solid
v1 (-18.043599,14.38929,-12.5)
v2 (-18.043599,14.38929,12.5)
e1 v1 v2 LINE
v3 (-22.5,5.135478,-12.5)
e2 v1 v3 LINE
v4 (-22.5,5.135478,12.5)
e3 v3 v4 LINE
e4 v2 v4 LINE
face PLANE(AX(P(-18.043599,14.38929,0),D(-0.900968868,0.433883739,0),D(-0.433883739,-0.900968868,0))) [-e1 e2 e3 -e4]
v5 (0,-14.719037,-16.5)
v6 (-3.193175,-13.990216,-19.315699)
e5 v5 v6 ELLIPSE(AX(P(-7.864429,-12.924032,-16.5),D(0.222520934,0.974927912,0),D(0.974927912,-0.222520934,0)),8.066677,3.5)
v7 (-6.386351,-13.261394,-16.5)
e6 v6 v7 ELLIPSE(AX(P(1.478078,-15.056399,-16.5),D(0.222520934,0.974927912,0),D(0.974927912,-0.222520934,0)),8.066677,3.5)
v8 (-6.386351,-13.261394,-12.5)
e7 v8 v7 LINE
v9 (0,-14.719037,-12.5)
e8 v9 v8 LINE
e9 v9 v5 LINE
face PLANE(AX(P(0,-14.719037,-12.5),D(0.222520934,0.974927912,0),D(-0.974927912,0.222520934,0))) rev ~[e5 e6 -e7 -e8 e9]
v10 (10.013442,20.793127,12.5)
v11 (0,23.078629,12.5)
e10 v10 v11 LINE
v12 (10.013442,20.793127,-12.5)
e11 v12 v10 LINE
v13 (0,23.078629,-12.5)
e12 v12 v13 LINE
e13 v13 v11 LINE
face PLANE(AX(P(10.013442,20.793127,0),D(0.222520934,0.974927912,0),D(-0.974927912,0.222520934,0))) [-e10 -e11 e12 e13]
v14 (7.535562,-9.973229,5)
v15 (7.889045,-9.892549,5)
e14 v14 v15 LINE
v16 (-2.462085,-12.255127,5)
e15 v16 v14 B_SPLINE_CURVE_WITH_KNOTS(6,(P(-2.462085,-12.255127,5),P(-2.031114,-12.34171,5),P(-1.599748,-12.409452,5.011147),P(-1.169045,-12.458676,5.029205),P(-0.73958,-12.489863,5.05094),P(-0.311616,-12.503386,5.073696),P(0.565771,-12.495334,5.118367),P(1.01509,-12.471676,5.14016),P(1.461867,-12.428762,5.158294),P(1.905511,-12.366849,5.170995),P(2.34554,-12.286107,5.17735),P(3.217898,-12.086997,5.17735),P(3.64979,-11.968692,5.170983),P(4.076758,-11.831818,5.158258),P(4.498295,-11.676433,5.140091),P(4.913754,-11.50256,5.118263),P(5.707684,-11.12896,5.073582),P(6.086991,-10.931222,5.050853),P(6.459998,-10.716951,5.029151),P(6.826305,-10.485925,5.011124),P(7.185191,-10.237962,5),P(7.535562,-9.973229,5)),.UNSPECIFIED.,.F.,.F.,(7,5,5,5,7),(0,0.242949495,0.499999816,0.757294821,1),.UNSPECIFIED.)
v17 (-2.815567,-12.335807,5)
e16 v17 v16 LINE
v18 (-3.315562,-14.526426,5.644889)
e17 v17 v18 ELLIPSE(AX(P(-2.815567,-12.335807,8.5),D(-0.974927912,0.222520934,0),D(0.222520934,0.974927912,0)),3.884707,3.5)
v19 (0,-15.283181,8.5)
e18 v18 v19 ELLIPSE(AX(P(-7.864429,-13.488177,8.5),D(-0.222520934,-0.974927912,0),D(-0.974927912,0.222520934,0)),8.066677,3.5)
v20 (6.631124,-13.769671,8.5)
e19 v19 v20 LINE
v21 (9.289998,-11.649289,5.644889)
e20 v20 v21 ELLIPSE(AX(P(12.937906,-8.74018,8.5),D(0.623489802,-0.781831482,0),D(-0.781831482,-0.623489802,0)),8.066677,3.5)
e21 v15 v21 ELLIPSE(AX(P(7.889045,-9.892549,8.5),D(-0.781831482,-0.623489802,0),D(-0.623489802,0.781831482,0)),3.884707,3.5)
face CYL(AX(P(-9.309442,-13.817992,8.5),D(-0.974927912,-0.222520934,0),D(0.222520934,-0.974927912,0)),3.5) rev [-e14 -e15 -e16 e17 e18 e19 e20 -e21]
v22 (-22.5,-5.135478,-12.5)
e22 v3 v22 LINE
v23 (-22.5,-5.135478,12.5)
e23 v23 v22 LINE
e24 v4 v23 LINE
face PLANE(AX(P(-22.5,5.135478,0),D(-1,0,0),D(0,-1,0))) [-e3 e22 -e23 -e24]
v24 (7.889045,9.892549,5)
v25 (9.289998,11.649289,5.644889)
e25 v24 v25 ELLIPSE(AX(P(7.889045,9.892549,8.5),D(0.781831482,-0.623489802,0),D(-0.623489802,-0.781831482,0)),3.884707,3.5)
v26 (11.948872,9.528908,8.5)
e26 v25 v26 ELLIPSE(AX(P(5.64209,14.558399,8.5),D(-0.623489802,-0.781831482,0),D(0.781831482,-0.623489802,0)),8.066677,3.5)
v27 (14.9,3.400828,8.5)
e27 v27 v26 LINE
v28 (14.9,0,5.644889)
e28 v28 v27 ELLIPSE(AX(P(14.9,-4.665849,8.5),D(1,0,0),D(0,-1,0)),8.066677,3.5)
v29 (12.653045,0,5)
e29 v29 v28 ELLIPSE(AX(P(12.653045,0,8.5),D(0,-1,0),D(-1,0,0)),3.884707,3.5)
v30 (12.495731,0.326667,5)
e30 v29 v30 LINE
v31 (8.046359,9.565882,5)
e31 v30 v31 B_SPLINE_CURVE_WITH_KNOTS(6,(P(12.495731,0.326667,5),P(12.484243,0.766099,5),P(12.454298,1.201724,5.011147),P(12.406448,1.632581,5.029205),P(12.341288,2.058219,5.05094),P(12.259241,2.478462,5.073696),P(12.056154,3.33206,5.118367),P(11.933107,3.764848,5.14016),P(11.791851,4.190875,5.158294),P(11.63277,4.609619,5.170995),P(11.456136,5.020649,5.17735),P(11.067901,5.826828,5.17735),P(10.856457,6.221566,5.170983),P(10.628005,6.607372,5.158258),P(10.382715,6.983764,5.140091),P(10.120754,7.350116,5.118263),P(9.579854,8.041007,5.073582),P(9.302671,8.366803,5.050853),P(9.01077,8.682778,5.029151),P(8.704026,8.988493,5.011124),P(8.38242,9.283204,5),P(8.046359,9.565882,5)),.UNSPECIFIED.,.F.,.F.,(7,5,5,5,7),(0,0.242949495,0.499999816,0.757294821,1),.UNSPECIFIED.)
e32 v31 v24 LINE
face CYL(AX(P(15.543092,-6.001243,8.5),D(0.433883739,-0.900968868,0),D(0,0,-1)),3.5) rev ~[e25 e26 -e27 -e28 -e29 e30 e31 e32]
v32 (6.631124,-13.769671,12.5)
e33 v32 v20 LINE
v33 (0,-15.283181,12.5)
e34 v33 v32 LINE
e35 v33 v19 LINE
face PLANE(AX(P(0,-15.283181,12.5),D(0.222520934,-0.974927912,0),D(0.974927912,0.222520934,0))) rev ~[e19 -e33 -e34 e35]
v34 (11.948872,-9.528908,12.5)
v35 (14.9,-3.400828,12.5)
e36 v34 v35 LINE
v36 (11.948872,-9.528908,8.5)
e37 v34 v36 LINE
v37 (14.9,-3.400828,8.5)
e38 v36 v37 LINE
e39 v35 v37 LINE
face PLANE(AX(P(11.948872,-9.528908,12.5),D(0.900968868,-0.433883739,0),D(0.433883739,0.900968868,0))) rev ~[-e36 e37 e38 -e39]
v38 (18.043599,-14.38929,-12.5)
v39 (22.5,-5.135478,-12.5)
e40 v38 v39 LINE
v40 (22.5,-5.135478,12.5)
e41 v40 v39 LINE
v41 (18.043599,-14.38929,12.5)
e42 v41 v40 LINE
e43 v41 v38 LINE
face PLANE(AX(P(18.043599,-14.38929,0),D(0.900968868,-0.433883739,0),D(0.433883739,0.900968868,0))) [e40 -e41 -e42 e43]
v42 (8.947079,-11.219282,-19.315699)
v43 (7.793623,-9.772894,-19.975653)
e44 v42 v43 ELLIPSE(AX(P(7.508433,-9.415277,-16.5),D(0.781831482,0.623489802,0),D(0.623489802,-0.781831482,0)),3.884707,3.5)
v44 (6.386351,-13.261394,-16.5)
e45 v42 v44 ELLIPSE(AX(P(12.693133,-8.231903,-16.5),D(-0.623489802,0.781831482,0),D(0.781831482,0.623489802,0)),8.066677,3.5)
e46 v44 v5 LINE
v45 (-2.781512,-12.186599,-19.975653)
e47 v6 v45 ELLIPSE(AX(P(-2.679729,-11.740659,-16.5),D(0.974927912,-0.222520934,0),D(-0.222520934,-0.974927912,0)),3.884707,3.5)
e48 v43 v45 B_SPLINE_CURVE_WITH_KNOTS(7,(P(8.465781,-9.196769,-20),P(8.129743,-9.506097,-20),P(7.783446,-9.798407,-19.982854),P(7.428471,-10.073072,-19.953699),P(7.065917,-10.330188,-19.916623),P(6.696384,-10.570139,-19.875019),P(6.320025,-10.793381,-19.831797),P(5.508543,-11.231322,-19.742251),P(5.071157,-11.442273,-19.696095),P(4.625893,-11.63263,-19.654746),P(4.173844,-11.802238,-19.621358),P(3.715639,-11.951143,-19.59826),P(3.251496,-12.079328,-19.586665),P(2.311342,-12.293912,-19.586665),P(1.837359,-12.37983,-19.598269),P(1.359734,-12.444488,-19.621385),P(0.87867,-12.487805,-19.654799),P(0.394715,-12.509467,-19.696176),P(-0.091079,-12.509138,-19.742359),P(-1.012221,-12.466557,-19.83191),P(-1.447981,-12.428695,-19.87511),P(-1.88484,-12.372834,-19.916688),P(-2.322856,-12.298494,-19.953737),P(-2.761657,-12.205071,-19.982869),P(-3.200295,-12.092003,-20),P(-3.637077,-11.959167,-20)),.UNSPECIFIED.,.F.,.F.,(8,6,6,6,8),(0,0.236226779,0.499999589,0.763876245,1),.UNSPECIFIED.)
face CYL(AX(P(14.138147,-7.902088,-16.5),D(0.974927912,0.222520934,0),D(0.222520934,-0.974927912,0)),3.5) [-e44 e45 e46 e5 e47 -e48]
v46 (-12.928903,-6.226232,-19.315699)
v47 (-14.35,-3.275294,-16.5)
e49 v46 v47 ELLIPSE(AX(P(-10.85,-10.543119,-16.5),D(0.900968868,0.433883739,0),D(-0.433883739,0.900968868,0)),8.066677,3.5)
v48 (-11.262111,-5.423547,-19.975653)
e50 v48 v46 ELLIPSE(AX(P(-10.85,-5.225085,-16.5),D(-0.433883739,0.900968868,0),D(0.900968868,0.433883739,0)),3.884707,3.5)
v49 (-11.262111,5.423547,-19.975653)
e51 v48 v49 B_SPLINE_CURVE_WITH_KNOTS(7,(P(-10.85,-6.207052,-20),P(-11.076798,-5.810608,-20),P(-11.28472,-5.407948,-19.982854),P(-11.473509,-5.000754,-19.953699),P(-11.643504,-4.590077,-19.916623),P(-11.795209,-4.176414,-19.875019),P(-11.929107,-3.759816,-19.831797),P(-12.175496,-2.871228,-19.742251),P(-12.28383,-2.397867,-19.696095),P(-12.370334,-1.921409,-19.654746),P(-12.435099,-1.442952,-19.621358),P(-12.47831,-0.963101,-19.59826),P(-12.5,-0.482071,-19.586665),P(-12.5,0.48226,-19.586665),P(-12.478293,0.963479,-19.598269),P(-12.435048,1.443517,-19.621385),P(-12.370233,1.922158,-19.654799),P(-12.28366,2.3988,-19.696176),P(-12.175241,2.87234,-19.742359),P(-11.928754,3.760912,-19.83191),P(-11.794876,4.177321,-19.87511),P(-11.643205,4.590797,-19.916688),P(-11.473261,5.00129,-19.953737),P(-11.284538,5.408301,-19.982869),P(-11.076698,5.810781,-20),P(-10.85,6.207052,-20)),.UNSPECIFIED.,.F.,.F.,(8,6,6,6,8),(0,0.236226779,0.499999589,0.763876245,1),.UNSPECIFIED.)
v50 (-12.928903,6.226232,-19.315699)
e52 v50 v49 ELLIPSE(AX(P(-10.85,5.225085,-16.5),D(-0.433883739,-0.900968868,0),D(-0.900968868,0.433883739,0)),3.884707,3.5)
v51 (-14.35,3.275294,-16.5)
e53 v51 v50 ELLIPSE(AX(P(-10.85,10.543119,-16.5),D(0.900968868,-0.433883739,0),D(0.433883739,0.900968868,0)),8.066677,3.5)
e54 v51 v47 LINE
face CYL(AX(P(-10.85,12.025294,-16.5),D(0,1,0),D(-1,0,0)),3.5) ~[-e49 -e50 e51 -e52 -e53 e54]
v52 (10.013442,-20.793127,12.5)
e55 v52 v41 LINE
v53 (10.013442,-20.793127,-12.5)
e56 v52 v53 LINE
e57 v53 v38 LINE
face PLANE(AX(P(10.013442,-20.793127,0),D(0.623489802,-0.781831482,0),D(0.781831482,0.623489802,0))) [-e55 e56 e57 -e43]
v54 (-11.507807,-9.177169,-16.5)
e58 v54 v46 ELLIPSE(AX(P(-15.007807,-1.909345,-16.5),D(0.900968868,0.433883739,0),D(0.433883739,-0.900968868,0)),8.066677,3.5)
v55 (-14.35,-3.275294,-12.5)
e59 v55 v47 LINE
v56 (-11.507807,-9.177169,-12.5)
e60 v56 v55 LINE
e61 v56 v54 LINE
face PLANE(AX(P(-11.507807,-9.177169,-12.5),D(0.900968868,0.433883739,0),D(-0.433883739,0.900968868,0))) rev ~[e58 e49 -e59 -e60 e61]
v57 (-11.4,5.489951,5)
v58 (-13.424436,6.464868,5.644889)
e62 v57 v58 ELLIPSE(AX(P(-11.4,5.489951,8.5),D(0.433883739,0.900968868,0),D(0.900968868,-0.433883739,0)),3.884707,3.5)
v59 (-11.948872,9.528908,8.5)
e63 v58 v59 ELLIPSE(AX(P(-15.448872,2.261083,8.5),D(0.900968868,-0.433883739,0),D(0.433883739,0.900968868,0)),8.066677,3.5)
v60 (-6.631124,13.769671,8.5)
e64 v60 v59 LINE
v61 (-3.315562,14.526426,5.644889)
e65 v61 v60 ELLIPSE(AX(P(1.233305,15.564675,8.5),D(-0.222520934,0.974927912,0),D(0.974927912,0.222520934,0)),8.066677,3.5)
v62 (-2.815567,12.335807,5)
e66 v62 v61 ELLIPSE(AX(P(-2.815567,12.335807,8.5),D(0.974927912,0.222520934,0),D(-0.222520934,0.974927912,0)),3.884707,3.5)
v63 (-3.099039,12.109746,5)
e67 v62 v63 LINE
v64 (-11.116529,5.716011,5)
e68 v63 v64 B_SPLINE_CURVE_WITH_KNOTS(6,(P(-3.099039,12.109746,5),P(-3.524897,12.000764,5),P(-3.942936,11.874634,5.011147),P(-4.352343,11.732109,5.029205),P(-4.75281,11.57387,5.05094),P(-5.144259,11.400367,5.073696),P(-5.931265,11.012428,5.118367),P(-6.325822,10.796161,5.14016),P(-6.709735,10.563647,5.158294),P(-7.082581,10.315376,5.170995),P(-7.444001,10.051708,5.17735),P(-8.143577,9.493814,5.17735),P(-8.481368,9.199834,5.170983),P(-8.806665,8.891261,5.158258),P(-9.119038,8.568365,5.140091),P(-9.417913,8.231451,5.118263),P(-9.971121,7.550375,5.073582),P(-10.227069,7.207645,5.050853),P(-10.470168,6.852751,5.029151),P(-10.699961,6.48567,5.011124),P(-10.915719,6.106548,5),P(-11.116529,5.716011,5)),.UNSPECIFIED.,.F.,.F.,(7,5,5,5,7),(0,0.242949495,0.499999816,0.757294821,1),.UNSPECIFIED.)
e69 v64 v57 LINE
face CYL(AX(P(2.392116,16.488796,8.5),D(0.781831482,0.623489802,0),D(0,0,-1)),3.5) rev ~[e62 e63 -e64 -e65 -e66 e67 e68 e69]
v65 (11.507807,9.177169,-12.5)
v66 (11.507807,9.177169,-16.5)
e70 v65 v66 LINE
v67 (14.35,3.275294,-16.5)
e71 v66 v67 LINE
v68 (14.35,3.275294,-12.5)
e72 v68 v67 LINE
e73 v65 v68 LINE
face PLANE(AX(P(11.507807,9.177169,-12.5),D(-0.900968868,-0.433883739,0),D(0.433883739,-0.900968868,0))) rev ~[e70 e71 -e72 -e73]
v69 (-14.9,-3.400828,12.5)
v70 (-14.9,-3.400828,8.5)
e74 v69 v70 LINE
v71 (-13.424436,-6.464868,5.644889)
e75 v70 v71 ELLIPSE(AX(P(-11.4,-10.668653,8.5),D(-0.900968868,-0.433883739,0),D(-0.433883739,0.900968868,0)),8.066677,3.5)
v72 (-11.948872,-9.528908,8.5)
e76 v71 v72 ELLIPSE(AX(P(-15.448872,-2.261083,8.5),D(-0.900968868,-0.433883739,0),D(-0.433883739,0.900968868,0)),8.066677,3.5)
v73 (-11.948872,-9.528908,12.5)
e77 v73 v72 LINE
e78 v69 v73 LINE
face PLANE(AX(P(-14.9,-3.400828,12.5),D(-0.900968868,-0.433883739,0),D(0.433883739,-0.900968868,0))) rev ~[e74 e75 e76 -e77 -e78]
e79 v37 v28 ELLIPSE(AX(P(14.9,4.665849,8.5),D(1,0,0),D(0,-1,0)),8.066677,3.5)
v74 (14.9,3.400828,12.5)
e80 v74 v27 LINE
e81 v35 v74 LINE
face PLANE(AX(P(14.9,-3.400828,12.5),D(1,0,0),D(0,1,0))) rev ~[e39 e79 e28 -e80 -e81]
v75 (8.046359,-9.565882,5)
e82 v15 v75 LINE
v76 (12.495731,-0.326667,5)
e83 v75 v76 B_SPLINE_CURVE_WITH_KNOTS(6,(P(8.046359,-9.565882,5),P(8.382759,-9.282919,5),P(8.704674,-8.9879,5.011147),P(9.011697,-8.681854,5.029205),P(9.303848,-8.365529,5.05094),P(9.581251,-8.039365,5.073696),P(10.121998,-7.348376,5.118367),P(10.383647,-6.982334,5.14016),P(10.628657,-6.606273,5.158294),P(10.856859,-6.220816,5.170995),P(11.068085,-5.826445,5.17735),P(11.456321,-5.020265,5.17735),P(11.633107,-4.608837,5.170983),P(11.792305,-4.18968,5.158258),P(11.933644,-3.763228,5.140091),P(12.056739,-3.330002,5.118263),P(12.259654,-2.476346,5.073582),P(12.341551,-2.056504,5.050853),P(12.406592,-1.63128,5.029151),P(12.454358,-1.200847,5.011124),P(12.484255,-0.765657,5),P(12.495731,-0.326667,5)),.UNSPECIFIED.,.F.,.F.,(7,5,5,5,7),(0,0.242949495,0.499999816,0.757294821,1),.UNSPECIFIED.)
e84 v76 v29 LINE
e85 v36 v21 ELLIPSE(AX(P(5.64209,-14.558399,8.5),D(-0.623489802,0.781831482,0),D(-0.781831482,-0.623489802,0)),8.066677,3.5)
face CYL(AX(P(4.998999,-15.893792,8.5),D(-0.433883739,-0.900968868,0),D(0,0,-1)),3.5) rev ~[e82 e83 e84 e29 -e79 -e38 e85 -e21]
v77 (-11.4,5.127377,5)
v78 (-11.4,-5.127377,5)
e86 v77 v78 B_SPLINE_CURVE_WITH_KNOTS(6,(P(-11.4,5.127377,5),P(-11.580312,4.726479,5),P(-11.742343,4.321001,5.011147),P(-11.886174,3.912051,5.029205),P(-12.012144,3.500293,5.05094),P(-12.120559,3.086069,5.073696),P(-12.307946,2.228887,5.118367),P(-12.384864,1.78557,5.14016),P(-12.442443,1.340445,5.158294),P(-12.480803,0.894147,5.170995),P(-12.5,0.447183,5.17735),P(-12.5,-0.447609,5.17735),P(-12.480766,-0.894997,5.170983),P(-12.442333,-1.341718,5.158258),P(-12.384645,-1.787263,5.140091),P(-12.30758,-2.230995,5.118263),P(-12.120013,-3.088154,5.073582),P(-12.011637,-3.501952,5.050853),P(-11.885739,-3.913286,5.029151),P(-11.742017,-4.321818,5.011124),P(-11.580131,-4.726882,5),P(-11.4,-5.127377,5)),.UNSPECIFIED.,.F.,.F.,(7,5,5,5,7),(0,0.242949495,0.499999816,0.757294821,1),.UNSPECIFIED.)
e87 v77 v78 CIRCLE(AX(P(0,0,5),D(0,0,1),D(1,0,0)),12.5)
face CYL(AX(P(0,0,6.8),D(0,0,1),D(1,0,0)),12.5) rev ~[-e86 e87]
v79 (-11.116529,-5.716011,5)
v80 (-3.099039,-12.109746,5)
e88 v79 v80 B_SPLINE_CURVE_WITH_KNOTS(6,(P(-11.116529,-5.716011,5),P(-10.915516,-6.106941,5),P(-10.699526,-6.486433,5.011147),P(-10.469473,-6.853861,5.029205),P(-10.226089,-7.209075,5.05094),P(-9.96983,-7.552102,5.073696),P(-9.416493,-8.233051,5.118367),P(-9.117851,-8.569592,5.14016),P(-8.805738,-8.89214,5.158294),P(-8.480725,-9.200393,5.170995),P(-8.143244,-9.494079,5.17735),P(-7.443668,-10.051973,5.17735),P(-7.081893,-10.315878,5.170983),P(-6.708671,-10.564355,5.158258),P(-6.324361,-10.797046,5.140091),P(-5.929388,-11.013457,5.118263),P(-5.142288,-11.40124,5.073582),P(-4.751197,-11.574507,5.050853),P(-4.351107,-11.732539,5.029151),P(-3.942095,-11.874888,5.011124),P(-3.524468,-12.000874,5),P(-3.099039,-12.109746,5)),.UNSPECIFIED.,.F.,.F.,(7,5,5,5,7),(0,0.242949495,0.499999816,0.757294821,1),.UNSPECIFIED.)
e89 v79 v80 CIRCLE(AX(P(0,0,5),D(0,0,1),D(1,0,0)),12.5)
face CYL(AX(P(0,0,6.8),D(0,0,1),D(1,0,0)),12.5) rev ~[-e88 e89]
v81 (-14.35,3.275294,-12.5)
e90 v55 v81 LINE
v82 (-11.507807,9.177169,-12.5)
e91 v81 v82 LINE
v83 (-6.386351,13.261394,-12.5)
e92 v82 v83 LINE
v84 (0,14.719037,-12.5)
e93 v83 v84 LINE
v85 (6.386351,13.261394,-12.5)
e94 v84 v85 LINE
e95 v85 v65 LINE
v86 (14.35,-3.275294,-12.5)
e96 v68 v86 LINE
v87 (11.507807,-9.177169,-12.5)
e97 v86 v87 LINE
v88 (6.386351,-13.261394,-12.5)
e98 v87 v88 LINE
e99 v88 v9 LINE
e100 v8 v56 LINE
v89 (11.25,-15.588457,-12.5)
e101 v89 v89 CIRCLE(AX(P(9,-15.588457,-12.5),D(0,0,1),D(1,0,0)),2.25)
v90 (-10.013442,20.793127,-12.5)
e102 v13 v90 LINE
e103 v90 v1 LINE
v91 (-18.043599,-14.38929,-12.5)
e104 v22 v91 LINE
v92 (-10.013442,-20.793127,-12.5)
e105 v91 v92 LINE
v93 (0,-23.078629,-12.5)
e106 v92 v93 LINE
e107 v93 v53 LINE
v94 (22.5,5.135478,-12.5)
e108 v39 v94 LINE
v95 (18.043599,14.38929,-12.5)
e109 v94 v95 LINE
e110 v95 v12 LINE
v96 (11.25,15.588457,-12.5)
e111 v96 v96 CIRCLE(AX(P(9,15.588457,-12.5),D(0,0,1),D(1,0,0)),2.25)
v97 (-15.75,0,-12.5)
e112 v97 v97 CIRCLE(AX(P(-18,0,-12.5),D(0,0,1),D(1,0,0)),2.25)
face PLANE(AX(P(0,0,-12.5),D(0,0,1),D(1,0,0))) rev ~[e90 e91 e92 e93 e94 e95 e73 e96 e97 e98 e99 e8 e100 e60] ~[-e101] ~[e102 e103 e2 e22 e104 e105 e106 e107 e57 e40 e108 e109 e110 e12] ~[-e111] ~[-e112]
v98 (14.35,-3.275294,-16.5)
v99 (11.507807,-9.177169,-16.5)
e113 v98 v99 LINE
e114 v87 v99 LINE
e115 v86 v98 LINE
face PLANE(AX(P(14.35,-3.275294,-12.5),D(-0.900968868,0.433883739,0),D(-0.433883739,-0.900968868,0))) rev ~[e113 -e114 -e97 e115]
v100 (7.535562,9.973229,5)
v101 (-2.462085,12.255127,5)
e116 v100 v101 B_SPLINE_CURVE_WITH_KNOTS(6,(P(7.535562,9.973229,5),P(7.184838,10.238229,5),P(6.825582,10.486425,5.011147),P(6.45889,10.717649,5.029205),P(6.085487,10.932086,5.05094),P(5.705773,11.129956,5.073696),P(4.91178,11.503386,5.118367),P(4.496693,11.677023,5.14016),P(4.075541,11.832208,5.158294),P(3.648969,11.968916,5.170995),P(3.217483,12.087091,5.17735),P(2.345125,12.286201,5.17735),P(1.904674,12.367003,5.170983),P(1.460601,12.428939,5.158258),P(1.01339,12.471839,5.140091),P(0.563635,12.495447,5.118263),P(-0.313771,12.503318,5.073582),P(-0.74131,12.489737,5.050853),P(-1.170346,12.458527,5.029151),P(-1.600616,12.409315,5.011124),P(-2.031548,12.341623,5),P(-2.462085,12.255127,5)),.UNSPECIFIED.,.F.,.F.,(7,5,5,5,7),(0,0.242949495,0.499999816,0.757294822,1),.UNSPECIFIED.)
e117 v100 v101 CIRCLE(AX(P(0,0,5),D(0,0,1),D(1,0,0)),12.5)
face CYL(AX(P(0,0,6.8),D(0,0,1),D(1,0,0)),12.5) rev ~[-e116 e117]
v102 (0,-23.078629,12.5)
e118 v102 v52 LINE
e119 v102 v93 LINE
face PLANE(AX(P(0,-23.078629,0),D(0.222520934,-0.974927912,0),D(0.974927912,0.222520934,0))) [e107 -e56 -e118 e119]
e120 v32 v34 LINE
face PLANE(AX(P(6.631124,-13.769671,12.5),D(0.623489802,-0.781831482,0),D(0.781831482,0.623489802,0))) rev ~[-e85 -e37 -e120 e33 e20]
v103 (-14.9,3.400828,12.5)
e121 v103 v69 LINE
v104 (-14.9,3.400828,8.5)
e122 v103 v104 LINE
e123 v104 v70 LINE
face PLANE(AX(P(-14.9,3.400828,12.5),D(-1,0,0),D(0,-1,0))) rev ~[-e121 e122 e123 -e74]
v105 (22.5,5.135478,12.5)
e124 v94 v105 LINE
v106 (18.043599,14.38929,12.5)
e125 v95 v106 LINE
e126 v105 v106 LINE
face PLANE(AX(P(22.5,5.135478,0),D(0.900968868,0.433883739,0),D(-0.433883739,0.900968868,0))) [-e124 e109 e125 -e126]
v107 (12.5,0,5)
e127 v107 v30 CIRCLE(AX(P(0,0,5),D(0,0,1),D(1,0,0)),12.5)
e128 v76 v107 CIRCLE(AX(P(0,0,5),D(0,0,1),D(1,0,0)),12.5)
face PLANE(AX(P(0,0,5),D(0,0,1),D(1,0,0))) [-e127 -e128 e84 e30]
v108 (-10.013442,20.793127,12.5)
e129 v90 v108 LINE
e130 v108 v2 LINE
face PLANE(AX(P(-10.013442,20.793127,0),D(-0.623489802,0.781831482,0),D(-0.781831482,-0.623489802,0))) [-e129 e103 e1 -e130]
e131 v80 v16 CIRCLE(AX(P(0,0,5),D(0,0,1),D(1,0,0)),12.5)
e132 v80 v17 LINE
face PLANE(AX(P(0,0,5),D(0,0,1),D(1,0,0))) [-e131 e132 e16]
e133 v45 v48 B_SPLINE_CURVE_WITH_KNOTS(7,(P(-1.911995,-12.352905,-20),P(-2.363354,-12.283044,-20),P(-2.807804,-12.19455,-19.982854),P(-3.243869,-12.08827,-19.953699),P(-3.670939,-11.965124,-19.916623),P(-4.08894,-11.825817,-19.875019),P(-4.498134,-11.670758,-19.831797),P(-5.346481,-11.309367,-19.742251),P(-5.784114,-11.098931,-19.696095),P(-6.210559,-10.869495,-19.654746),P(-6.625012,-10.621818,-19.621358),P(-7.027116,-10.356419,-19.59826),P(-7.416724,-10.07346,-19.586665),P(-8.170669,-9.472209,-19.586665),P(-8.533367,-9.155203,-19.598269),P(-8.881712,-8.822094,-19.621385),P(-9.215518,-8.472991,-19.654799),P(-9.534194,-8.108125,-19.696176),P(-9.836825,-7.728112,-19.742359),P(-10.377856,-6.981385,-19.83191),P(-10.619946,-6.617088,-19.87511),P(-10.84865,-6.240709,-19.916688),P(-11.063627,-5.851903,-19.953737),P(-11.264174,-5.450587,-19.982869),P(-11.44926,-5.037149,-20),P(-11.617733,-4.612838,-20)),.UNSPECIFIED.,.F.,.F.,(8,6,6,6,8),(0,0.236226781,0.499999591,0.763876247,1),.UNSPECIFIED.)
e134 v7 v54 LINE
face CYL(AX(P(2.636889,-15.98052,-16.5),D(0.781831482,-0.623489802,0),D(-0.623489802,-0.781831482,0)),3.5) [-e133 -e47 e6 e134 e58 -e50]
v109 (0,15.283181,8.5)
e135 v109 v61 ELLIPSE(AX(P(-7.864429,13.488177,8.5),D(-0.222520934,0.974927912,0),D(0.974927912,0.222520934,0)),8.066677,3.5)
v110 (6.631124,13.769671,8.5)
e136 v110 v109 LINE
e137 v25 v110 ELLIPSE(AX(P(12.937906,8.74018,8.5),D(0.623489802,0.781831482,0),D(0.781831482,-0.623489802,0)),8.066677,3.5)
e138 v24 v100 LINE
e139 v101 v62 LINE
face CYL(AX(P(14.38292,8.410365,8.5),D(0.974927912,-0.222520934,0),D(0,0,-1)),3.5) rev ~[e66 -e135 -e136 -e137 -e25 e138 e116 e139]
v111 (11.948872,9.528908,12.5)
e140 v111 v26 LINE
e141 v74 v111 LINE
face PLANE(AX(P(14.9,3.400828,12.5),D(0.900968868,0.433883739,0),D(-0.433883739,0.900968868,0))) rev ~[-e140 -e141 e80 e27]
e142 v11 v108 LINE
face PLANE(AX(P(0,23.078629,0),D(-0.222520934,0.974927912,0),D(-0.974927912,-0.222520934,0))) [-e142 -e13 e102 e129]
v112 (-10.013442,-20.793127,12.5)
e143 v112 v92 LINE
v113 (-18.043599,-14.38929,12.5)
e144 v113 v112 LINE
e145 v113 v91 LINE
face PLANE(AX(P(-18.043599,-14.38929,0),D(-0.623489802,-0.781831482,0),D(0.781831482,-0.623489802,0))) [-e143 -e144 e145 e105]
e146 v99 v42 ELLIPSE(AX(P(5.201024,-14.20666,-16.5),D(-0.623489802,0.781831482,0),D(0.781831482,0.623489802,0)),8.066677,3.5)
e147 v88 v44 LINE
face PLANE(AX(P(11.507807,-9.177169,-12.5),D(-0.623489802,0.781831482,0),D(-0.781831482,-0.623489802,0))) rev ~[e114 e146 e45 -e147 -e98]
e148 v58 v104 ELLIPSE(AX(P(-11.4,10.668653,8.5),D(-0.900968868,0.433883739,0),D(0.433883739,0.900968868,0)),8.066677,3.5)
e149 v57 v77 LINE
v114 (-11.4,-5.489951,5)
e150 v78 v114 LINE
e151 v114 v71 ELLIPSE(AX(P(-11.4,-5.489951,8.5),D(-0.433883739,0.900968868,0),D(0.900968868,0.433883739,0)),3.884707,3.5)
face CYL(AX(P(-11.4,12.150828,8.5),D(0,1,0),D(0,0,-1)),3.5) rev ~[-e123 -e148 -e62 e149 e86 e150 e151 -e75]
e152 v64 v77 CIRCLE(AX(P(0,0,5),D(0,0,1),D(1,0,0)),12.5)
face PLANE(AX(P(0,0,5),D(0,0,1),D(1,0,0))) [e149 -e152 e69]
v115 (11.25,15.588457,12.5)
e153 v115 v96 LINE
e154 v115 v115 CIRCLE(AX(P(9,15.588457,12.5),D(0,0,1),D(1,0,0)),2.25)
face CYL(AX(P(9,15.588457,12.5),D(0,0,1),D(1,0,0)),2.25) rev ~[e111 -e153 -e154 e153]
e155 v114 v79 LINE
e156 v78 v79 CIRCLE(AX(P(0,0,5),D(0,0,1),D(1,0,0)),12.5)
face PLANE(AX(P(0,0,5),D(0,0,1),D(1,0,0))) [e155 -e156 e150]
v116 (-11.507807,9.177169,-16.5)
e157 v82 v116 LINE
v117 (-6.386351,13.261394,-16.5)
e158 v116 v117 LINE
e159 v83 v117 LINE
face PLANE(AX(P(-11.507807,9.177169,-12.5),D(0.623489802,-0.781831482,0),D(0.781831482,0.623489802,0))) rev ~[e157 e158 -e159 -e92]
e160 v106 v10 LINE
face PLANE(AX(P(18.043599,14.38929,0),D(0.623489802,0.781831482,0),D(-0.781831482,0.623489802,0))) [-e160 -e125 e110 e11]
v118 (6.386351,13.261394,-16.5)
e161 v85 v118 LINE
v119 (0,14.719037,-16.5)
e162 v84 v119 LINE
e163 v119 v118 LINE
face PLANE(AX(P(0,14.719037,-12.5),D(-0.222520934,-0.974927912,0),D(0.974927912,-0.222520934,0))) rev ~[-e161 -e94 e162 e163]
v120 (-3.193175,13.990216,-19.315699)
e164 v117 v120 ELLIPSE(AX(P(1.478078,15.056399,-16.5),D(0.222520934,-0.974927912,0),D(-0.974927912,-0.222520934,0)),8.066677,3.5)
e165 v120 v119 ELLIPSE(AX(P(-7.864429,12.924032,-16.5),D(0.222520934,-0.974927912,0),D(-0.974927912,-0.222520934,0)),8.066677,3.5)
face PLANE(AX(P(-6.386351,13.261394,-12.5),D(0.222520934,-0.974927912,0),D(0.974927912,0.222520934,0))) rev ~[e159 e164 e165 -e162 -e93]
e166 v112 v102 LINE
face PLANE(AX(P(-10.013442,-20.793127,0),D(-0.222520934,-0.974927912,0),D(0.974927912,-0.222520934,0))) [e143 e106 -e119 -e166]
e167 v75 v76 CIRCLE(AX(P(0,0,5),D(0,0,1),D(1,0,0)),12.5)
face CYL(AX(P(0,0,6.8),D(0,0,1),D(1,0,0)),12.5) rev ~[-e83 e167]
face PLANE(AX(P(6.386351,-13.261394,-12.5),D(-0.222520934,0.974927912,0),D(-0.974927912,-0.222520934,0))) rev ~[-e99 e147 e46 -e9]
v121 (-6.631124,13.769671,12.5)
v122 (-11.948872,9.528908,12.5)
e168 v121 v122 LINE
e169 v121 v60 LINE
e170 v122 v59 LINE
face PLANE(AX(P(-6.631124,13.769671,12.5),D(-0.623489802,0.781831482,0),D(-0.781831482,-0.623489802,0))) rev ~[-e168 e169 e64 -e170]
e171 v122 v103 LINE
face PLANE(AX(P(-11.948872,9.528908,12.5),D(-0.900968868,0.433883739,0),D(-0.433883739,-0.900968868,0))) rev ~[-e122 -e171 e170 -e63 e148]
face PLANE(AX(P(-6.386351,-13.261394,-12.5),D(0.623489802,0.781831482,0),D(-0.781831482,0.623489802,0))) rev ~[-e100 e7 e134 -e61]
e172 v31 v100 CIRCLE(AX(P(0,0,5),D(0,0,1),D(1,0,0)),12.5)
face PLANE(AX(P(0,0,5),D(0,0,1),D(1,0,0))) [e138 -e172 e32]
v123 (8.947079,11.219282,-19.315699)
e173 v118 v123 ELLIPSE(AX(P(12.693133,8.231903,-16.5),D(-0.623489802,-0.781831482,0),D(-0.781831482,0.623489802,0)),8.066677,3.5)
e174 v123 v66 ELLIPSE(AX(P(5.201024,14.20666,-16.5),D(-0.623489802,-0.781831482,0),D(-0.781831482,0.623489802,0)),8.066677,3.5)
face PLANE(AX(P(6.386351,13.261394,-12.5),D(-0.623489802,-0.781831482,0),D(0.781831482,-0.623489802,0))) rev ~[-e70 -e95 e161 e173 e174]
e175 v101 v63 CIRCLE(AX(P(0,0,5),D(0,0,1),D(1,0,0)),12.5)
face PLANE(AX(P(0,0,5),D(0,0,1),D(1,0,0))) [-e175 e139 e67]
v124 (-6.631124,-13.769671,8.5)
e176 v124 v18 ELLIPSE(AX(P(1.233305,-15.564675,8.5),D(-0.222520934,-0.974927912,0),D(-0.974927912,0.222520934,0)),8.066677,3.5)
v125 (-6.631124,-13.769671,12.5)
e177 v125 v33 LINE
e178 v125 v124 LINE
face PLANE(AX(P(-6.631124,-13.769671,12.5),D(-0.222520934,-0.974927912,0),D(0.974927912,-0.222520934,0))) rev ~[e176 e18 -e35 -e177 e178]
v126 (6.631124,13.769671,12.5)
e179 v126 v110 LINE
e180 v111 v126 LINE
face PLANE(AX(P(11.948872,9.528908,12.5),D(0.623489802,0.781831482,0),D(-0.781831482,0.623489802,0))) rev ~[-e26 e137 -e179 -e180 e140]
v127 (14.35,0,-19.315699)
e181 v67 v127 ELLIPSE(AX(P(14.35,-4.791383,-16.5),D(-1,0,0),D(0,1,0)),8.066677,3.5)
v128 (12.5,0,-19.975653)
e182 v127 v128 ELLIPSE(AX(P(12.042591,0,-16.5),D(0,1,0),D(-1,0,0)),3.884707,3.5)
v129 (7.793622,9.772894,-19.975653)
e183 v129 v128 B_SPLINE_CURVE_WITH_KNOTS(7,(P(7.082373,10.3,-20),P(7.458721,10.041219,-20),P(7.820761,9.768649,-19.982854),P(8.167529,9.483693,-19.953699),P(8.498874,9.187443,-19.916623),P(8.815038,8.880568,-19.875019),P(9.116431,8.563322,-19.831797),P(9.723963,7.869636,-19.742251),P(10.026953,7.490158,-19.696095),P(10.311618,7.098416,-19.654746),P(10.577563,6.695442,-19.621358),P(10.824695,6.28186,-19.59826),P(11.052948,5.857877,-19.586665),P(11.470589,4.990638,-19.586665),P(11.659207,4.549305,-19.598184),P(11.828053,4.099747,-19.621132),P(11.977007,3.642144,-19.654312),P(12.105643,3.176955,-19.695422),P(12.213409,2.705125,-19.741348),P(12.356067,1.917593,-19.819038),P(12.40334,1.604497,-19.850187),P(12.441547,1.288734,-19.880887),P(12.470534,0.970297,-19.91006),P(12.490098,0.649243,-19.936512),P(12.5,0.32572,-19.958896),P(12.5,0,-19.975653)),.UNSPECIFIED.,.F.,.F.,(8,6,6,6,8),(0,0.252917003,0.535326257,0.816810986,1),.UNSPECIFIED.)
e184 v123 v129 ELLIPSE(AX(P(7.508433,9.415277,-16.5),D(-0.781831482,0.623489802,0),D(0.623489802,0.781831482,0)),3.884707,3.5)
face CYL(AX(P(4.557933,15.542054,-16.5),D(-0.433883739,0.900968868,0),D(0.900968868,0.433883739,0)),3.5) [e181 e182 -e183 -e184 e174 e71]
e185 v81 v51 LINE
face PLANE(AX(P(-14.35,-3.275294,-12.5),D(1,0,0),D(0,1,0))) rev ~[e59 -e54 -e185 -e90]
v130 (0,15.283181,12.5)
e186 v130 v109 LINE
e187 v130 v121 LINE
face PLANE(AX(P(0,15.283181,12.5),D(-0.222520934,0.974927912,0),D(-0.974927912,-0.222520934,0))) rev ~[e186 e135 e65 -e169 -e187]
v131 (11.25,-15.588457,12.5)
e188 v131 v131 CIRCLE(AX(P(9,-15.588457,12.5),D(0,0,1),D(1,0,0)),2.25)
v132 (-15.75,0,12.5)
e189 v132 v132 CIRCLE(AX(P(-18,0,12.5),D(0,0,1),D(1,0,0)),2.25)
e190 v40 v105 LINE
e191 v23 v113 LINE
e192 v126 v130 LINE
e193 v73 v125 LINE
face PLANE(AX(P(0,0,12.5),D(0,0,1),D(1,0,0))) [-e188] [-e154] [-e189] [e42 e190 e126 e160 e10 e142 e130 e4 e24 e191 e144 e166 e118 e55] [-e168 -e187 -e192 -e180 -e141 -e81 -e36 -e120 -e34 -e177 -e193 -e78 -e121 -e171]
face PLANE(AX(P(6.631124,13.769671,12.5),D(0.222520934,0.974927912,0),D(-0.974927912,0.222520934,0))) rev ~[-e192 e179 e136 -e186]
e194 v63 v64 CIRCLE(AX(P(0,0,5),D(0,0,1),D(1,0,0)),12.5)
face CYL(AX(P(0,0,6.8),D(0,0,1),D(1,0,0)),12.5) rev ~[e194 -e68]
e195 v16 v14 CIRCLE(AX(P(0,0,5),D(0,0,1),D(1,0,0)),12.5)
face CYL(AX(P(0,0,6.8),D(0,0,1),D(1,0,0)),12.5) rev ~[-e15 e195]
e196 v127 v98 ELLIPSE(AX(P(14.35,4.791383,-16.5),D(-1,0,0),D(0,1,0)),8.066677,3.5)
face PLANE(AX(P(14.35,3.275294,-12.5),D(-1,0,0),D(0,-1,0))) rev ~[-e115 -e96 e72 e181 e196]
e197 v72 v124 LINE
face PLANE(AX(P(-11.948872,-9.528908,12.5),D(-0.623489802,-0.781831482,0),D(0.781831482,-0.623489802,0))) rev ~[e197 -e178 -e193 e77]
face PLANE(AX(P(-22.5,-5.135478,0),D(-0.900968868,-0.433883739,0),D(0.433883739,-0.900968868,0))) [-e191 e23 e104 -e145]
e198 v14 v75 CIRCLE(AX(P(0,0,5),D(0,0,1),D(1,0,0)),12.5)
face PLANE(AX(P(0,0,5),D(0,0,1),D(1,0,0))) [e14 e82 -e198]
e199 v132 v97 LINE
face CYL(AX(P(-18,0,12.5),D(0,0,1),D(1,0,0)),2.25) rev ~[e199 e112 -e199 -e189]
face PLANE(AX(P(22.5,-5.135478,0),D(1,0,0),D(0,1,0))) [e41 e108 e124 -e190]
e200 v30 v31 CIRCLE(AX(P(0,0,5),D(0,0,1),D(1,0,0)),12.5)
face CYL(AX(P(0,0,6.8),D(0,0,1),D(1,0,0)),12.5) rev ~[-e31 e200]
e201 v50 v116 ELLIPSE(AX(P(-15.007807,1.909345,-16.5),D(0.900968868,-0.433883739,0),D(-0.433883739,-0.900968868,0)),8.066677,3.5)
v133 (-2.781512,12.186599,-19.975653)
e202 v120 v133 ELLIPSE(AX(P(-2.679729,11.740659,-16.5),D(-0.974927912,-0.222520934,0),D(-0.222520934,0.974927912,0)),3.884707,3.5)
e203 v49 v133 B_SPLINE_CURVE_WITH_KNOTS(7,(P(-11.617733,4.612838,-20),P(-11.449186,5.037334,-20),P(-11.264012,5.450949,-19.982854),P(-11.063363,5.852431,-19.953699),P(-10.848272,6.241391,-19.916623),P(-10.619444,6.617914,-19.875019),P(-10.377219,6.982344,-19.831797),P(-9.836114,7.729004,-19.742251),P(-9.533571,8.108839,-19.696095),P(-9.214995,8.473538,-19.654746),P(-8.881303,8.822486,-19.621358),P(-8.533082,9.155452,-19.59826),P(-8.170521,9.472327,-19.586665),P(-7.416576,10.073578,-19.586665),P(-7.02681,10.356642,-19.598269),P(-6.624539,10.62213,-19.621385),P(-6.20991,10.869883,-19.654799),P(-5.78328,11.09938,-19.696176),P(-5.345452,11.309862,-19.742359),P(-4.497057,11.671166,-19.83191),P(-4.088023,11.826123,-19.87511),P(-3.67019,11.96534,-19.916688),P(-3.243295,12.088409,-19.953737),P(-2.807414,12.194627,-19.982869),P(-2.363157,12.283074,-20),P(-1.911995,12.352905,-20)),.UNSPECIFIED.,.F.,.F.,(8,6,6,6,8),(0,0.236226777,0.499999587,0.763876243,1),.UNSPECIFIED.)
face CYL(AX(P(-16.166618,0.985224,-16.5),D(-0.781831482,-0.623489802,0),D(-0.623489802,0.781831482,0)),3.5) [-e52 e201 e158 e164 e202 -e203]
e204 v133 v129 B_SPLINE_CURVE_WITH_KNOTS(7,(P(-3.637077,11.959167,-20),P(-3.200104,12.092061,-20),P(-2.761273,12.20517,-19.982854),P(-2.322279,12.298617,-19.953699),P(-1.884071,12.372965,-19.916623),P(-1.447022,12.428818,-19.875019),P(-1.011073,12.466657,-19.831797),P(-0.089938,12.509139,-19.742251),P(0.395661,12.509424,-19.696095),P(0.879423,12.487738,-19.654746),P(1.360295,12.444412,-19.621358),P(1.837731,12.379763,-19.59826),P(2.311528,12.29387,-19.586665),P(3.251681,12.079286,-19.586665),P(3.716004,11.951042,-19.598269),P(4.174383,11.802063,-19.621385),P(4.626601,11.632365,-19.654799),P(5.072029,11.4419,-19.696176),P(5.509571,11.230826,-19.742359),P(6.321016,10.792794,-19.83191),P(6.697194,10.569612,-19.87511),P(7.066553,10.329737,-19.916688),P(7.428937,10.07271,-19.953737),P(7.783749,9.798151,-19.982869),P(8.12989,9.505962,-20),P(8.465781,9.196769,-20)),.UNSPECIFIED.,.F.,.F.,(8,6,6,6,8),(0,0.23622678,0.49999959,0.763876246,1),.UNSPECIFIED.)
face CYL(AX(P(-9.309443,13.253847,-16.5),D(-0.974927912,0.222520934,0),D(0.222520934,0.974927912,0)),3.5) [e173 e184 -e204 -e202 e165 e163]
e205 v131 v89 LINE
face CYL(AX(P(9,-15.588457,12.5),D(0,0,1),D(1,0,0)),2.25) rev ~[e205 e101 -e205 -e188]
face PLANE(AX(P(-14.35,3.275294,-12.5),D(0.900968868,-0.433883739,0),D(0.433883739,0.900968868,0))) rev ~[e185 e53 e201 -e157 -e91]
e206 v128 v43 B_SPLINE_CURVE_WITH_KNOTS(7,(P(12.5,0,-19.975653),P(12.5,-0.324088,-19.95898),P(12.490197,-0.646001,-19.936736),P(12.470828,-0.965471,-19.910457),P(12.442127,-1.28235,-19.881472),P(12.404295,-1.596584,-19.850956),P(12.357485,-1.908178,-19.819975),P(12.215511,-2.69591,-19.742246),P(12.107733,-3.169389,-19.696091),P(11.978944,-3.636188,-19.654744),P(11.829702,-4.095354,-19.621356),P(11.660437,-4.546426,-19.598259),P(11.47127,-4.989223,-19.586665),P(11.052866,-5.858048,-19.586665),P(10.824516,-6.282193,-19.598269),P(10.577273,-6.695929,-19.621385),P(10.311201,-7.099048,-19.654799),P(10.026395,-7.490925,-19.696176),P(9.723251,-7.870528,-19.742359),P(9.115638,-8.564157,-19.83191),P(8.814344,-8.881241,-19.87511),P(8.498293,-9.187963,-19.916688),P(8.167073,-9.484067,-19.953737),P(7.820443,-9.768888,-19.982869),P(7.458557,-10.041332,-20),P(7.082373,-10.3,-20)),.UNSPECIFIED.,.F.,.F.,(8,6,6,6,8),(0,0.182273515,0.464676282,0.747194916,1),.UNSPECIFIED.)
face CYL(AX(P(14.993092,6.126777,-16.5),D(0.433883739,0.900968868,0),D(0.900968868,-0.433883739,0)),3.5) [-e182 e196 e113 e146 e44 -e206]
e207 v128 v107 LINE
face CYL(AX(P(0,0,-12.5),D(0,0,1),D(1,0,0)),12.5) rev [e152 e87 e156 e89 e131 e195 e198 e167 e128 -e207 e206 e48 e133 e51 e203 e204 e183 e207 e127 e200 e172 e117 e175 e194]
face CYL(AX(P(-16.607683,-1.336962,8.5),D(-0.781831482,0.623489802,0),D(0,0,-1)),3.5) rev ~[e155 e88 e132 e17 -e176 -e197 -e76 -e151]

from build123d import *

# Parameters (mm, degrees)
F0_R         = 12.5
F1_DEPTH     = 12.5
F2_R         = 2.25
F3_DEPTH     = 25
F4_R         = 12.5
F5_DEPTH     = 7.5
F6_R         = 12.5
F7_DEPTH     = 7.5
F8_T4_DEPTH  = 24.3016555368
F8_S5_R      = 12.5
F8_T6_DEPTH  = 15
F8_T11_DEPTH = 24.3016555368
F8_S12_R     = 12.5
F8_T13_DEPTH = 14
F8_T17_DEPTH = 24.3016555368
F8_S18_R     = 12.5
F8_T19_DEPTH = 15
F8_T24_DEPTH = 24.3016555368
F8_S25_R     = 12.5
F8_T26_DEPTH = 15
F8_T30_DEPTH = 24.3016555368
F8_S31_R     = 12.5
F8_T32_DEPTH = 15
F8_T37_DEPTH = 24.3016555368
F8_S38_R     = 12.5
F8_T39_DEPTH = 15
F8_T44_DEPTH = 24.3016555368
F8_S45_R     = 12.5
F8_T46_DEPTH = 15
F9_T1_DEPTH  = 24.050587715
F9_T3_DEPTH  = 24.050587715
F9_T5_DEPTH  = 24.050587715
F9_T7_DEPTH  = 24.050587715
F9_T9_DEPTH  = 24.050587715
F9_T11_DEPTH = 24.050587715
F9_T13_DEPTH = 24.050587715


# Not quite as in the source:
# - a fillet or chamfer that OpenCascade refuses, or shapes differently, is made with other operations: its cross-section is extruded or revolved along the edge and cut away or added


with BuildPart() as f1:
    # F0 (on Top) → F1 (new body, symmetric)
    with BuildSketch(Plane.XY):
        Polygon((22.5, -5.1354781738), (22.5, 5.1354781738), (18.0435990556, 14.3892900865), (10.013442028, 20.7931266245), (0, 23.0786294236), (-10.013442028, 20.7931266245), (-18.0435990556, 14.3892900865), (-22.5, 5.1354781738), (-22.5, -5.1354781738), (-18.0435990556, -14.3892900865), (-10.013442028, -20.7931266245), (0, -23.0786294236), (10.013442028, -20.7931266245), (18.0435990556, -14.3892900865), align=None)
        Circle(F0_R, mode=Mode.SUBTRACT)
    extrude(amount=F1_DEPTH, both=True)

    # F2 (on face) → F3 (cut)
    with BuildSketch(Plane.XY.offset(12.5)):
        with Locations((9, 15.5884572681)):
            Circle(F2_R)
        with Locations((-18, 0)):
            Circle(F2_R)
        with Locations((9, -15.5884572681)):
            Circle(F2_R)
    extrude(amount=-F3_DEPTH, mode=Mode.SUBTRACT)

    # F4 (on face) → F5 (cut)
    with BuildSketch(Plane.XY.offset(12.5)):
        Polygon((14.9, -3.4008277684), (14.9, 3.4008277684), (11.9488722635, 9.5289076573), (6.6311238319, 13.7696705203), (0, 15.2831812628), (-6.6311238319, 13.7696705203), (-11.9488722635, 9.5289076573), (-14.9, 3.4008277684), (-14.9, -3.4008277684), (-11.9488722635, -9.5289076573), (-6.6311238319, -13.7696705203), (0, -15.2831812628), (6.6311238319, -13.7696705203), (11.9488722635, -9.5289076573), align=None)
        Circle(F4_R, mode=Mode.SUBTRACT)
    extrude(amount=-F5_DEPTH, mode=Mode.SUBTRACT)

    # F6 (on face) → F7 (join)
    with BuildSketch(Plane(origin=(0, 0, -12.5), x_dir=(1, 0, 0), z_dir=(0, 0, -1))):
        Polygon((14.35, -3.2752938575), (14.35, 3.2752938575), (11.5078065088, 9.1771694552), (6.3863508045, 13.2613940917), (0, 14.719036988), (-6.3863508045, 13.2613940917), (-11.5078065088, 9.1771694552), (-14.35, 3.2752938575), (-14.35, -3.2752938575), (-11.5078065088, -9.1771694552), (-6.3863508045, -13.2613940917), (0, -14.719036988), (6.3863508045, -13.2613940917), (11.5078065088, -9.1771694552), align=None)
        Circle(F6_R, mode=Mode.SUBTRACT)
    extrude(amount=F7_DEPTH)

    # F8: fillet of radius 3.5 on 7 edges, made by hand


with BuildPart() as f8_tool2:
    # F8_s3 → F8_t4 (new body)
    with BuildSketch(Plane(origin=(9.4998996874, 7.5759171977, 0), x_dir=(0, 0, 1), z_dir=(-0.7818314825, -0.6234898019, 0))):
        with BuildLine():
            ThreePointArc((5, 11.4), (6.0251262658, 13.8748737342), (8.5, 14.9))
            Line((8.5, 14.9), (5, 14.9))
            Line((5, 14.9), (5, 11.4))
        make_face()
    extrude(amount=F8_T4_DEPTH)

    # F8_s5 → F8_t6 (cut, symmetric)
    with BuildSketch(Plane.XY.offset(6.8)):
        Circle(F8_S5_R)
    extrude(amount=F8_T6_DEPTH, both=True, mode=Mode.SUBTRACT)

    split(bisect_by=Plane(origin=(-13.4244361317, 6.4648677129, 0), x_dir=(0, 0, 1), z_dir=(0.9009688679, -0.4338837391, 0)), keep=Keep.TOP)


with BuildPart() as f1_1:
    add(f1.part)

    # F8_t1: union F8_tool2
    add(f8_tool2.part)


with BuildPart() as f8_tool9:
    # F8_s10 → F8_t11 (new body)
    with BuildSketch(Plane.XZ.offset(-12.1508277684)):
        with BuildLine():
            ThreePointArc((-11.4, 5), (-13.8748737342, 6.0251262658), (-14.9, 8.5))
            Line((-14.9, 8.5), (-14.9, 5))
            Line((-14.9, 5), (-11.4, 5))
        make_face()
    extrude(amount=F8_T11_DEPTH)

    # F8_s12 → F8_t13 (cut, symmetric)
    with BuildSketch(Plane.XY.offset(6.8)):
        Circle(F8_S12_R)
    extrude(amount=F8_T13_DEPTH, both=True, mode=Mode.SUBTRACT)


with BuildPart() as f1_2:
    add(f1_1.part)

    # F8_t8: union F8_tool9
    add(f8_tool9.part)


with BuildPart() as f8_tool15:
    # F8_s16 → F8_t17 (new body)
    with BuildSketch(Plane(origin=(-9.4998996874, 7.5759171977, 0), x_dir=(0, 0, 1), z_dir=(0.7818314825, -0.6234898019, 0))):
        with BuildLine():
            ThreePointArc((5, 11.4), (6.0251262658, 13.8748737342), (8.5, 14.9))
            Line((8.5, 14.9), (5, 14.9))
            Line((5, 14.9), (5, 11.4))
        make_face()
    extrude(amount=F8_T17_DEPTH)

    # F8_s18 → F8_t19 (cut, symmetric)
    with BuildSketch(Plane.XY.offset(6.8)):
        Circle(F8_S18_R)
    extrude(amount=F8_T19_DEPTH, both=True, mode=Mode.SUBTRACT)

    split(bisect_by=Plane.YZ.offset(-14.9), keep=Keep.TOP)


with BuildPart() as f1_3:
    add(f1_2.part)

    # F8_t14: union F8_tool15
    add(f8_tool15.part)


with BuildPart() as f8_tool22:
    # F8_s23 → F8_t24 (new body)
    with BuildSketch(Plane(origin=(-11.8461811475, -2.7038135434, 0), x_dir=(0, 0, 1), z_dir=(0.9749279122, 0.222520934, 0))):
        with BuildLine():
            ThreePointArc((8.5, 14.9), (6.0251262658, 13.8748737342), (5, 11.4))
            Line((5, 11.4), (5, 14.9))
            Line((5, 14.9), (8.5, 14.9))
        make_face()
    extrude(amount=F8_T24_DEPTH)

    # F8_s25 → F8_t26 (cut, symmetric)
    with BuildSketch(Plane.XY.offset(6.8)):
        Circle(F8_S25_R)
    extrude(amount=F8_T26_DEPTH, both=True, mode=Mode.SUBTRACT)


with BuildPart() as f1_4:
    add(f1_3.part)

    # F8_t21: union F8_tool22
    add(f8_tool22.part)


with BuildPart() as f8_tool28:
    # F8_s29 → F8_t30 (new body)
    with BuildSketch(Plane(origin=(-5.2720465855, -10.9475175386, 0), x_dir=(0, 0, 1), z_dir=(0.4338837391, 0.9009688679, 0))):
        with BuildLine():
            ThreePointArc((5, 11.4), (6.0251262658, 13.8748737342), (8.5, 14.9))
            Line((8.5, 14.9), (5, 14.9))
            Line((5, 14.9), (5, 11.4))
        make_face()
    extrude(amount=F8_T30_DEPTH)

    # F8_s31 → F8_t32 (cut, symmetric)
    with BuildSketch(Plane.XY.offset(6.8)):
        Circle(F8_S31_R)
    extrude(amount=F8_T32_DEPTH, both=True, mode=Mode.SUBTRACT)

    split(bisect_by=Plane(origin=(9.2899980477, -11.6492890888, 0), x_dir=(0, 0, 1), z_dir=(-0.6234898019, 0.7818314825, 0)), keep=Keep.TOP)


with BuildPart() as f1_5:
    add(f1_4.part)

    # F8_t27: union F8_tool28
    add(f8_tool28.part)


with BuildPart() as f8_tool35:
    # F8_s36 → F8_t37 (new body)
    with BuildSketch(Plane(origin=(5.2720465855, -10.9475175386, 0), x_dir=(0, 0, 1), z_dir=(-0.4338837391, 0.9009688679, 0))):
        with BuildLine():
            ThreePointArc((5, 11.4), (6.0251262658, 13.8748737342), (8.5, 14.9))
            Line((8.5, 14.9), (5, 14.9))
            Line((5, 14.9), (5, 11.4))
        make_face()
    extrude(amount=F8_T37_DEPTH)

    # F8_s38 → F8_t39 (cut, symmetric)
    with BuildSketch(Plane.XY.offset(6.8)):
        Circle(F8_S38_R)
    extrude(amount=F8_T39_DEPTH, both=True, mode=Mode.SUBTRACT)

    split(bisect_by=Plane(origin=(9.2899980477, 11.6492890888, 0), x_dir=(0, 0, 1), z_dir=(-0.6234898019, -0.7818314825, 0)), keep=Keep.TOP)


with BuildPart() as f1_6:
    add(f1_5.part)

    # F8_t34: union F8_tool35
    add(f8_tool35.part)


with BuildPart() as f8_tool42:
    # F8_s43 → F8_t44 (new body)
    with BuildSketch(Plane(origin=(11.8461811475, -2.7038135434, 0), x_dir=(0, 0, 1), z_dir=(-0.9749279122, 0.222520934, 0))):
        with BuildLine():
            ThreePointArc((5, 11.4), (6.0251262658, 13.8748737342), (8.5, 14.9))
            Line((8.5, 14.9), (5, 14.9))
            Line((5, 14.9), (5, 11.4))
        make_face()
    extrude(amount=F8_T44_DEPTH)

    # F8_s45 → F8_t46 (cut, symmetric)
    with BuildSketch(Plane.XY.offset(6.8)):
        Circle(F8_S45_R)
    extrude(amount=F8_T46_DEPTH, both=True, mode=Mode.SUBTRACT)


with BuildPart() as f1_7:
    add(f1_6.part)

    # F8_t41: union F8_tool42
    add(f8_tool42.part)

    # F9: fillet of radius 3.5 on 7 edges, made by hand

    # F9_s2 → F9_t1 (cut)
    with BuildSketch(Plane(origin=(-5.2175794629, 10.834415393, 0), x_dir=(0, 0, 1), z_dir=(0.4338837391, -0.9009688679, 0))):
        with BuildLine():
            ThreePointArc((-16.5, -14.35), (-18.9748737342, -13.3248737342), (-20, -10.85))
            Line((-20, -10.85), (-20, -14.35))
            Line((-20, -14.35), (-16.5, -14.35))
        make_face()
    extrude(amount=F9_T1_DEPTH, mode=Mode.SUBTRACT)

    # F9_s4 → F9_t3 (cut)
    with BuildSketch(Plane(origin=(-11.7237946339, 2.6758796203, 0), x_dir=(0, 0, 1), z_dir=(0.9749279122, -0.222520934, 0))):
        with BuildLine():
            ThreePointArc((-16.5, -14.35), (-18.9748737342, -13.3248737342), (-20, -10.85))
            Line((-20, -10.85), (-20, -14.35))
            Line((-20, -14.35), (-16.5, -14.35))
        make_face()
    extrude(amount=F9_T3_DEPTH, mode=Mode.SUBTRACT)

    # F9_s6 → F9_t5 (cut)
    with BuildSketch(Plane(origin=(-9.4017533237, -7.4976480845, 0), x_dir=(0, 0, 1), z_dir=(0.7818314825, 0.6234898019, 0))):
        with BuildLine():
            ThreePointArc((-16.5, -14.35), (-18.9748737342, -13.3248737342), (-20, -10.85))
            Line((-20, -10.85), (-20, -14.35))
            Line((-20, -14.35), (-16.5, -14.35))
        make_face()
    extrude(amount=F9_T5_DEPTH, mode=Mode.SUBTRACT)

    # F9_s8 → F9_t7 (cut)
    with BuildSketch(Plane.XZ.offset(-12.0252938575)):
        with BuildLine():
            ThreePointArc((-14.35, -16.5), (-13.3248737342, -18.9748737342), (-10.85, -20))
            Line((-10.85, -20), (-14.35, -20))
            Line((-14.35, -20), (-14.35, -16.5))
        make_face()
    extrude(amount=F9_T7_DEPTH, mode=Mode.SUBTRACT)

    # F9_s10 → F9_t9 (cut)
    with BuildSketch(Plane(origin=(9.4017533237, -7.4976480845, 0), x_dir=(0, 0, 1), z_dir=(-0.7818314825, 0.6234898019, 0))):
        with BuildLine():
            ThreePointArc((-16.5, -14.35), (-18.9748737342, -13.3248737342), (-20, -10.85))
            Line((-20, -10.85), (-20, -14.35))
            Line((-20, -14.35), (-16.5, -14.35))
        make_face()
    extrude(amount=F9_T9_DEPTH, mode=Mode.SUBTRACT)

    # F9_s12 → F9_t11 (cut)
    with BuildSketch(Plane(origin=(11.7237946339, 2.6758796203, 0), x_dir=(0, 0, 1), z_dir=(-0.9749279122, -0.222520934, 0))):
        with BuildLine():
            ThreePointArc((-16.5, -14.35), (-18.9748737342, -13.3248737342), (-20, -10.85))
            Line((-20, -10.85), (-20, -14.35))
            Line((-20, -14.35), (-16.5, -14.35))
        make_face()
    extrude(amount=F9_T11_DEPTH, mode=Mode.SUBTRACT)

    # F9_s14 → F9_t13 (cut)
    with BuildSketch(Plane(origin=(5.2175794629, 10.834415393, 0), x_dir=(0, 0, 1), z_dir=(-0.4338837391, -0.9009688679, 0))):
        with BuildLine():
            ThreePointArc((-16.5, -14.35), (-18.9748737342, -13.3248737342), (-20, -10.85))
            Line((-20, -10.85), (-20, -14.35))
            Line((-20, -14.35), (-16.5, -14.35))
        make_face()
    extrude(amount=F9_T13_DEPTH, mode=Mode.SUBTRACT)


solid = f1_7.part
